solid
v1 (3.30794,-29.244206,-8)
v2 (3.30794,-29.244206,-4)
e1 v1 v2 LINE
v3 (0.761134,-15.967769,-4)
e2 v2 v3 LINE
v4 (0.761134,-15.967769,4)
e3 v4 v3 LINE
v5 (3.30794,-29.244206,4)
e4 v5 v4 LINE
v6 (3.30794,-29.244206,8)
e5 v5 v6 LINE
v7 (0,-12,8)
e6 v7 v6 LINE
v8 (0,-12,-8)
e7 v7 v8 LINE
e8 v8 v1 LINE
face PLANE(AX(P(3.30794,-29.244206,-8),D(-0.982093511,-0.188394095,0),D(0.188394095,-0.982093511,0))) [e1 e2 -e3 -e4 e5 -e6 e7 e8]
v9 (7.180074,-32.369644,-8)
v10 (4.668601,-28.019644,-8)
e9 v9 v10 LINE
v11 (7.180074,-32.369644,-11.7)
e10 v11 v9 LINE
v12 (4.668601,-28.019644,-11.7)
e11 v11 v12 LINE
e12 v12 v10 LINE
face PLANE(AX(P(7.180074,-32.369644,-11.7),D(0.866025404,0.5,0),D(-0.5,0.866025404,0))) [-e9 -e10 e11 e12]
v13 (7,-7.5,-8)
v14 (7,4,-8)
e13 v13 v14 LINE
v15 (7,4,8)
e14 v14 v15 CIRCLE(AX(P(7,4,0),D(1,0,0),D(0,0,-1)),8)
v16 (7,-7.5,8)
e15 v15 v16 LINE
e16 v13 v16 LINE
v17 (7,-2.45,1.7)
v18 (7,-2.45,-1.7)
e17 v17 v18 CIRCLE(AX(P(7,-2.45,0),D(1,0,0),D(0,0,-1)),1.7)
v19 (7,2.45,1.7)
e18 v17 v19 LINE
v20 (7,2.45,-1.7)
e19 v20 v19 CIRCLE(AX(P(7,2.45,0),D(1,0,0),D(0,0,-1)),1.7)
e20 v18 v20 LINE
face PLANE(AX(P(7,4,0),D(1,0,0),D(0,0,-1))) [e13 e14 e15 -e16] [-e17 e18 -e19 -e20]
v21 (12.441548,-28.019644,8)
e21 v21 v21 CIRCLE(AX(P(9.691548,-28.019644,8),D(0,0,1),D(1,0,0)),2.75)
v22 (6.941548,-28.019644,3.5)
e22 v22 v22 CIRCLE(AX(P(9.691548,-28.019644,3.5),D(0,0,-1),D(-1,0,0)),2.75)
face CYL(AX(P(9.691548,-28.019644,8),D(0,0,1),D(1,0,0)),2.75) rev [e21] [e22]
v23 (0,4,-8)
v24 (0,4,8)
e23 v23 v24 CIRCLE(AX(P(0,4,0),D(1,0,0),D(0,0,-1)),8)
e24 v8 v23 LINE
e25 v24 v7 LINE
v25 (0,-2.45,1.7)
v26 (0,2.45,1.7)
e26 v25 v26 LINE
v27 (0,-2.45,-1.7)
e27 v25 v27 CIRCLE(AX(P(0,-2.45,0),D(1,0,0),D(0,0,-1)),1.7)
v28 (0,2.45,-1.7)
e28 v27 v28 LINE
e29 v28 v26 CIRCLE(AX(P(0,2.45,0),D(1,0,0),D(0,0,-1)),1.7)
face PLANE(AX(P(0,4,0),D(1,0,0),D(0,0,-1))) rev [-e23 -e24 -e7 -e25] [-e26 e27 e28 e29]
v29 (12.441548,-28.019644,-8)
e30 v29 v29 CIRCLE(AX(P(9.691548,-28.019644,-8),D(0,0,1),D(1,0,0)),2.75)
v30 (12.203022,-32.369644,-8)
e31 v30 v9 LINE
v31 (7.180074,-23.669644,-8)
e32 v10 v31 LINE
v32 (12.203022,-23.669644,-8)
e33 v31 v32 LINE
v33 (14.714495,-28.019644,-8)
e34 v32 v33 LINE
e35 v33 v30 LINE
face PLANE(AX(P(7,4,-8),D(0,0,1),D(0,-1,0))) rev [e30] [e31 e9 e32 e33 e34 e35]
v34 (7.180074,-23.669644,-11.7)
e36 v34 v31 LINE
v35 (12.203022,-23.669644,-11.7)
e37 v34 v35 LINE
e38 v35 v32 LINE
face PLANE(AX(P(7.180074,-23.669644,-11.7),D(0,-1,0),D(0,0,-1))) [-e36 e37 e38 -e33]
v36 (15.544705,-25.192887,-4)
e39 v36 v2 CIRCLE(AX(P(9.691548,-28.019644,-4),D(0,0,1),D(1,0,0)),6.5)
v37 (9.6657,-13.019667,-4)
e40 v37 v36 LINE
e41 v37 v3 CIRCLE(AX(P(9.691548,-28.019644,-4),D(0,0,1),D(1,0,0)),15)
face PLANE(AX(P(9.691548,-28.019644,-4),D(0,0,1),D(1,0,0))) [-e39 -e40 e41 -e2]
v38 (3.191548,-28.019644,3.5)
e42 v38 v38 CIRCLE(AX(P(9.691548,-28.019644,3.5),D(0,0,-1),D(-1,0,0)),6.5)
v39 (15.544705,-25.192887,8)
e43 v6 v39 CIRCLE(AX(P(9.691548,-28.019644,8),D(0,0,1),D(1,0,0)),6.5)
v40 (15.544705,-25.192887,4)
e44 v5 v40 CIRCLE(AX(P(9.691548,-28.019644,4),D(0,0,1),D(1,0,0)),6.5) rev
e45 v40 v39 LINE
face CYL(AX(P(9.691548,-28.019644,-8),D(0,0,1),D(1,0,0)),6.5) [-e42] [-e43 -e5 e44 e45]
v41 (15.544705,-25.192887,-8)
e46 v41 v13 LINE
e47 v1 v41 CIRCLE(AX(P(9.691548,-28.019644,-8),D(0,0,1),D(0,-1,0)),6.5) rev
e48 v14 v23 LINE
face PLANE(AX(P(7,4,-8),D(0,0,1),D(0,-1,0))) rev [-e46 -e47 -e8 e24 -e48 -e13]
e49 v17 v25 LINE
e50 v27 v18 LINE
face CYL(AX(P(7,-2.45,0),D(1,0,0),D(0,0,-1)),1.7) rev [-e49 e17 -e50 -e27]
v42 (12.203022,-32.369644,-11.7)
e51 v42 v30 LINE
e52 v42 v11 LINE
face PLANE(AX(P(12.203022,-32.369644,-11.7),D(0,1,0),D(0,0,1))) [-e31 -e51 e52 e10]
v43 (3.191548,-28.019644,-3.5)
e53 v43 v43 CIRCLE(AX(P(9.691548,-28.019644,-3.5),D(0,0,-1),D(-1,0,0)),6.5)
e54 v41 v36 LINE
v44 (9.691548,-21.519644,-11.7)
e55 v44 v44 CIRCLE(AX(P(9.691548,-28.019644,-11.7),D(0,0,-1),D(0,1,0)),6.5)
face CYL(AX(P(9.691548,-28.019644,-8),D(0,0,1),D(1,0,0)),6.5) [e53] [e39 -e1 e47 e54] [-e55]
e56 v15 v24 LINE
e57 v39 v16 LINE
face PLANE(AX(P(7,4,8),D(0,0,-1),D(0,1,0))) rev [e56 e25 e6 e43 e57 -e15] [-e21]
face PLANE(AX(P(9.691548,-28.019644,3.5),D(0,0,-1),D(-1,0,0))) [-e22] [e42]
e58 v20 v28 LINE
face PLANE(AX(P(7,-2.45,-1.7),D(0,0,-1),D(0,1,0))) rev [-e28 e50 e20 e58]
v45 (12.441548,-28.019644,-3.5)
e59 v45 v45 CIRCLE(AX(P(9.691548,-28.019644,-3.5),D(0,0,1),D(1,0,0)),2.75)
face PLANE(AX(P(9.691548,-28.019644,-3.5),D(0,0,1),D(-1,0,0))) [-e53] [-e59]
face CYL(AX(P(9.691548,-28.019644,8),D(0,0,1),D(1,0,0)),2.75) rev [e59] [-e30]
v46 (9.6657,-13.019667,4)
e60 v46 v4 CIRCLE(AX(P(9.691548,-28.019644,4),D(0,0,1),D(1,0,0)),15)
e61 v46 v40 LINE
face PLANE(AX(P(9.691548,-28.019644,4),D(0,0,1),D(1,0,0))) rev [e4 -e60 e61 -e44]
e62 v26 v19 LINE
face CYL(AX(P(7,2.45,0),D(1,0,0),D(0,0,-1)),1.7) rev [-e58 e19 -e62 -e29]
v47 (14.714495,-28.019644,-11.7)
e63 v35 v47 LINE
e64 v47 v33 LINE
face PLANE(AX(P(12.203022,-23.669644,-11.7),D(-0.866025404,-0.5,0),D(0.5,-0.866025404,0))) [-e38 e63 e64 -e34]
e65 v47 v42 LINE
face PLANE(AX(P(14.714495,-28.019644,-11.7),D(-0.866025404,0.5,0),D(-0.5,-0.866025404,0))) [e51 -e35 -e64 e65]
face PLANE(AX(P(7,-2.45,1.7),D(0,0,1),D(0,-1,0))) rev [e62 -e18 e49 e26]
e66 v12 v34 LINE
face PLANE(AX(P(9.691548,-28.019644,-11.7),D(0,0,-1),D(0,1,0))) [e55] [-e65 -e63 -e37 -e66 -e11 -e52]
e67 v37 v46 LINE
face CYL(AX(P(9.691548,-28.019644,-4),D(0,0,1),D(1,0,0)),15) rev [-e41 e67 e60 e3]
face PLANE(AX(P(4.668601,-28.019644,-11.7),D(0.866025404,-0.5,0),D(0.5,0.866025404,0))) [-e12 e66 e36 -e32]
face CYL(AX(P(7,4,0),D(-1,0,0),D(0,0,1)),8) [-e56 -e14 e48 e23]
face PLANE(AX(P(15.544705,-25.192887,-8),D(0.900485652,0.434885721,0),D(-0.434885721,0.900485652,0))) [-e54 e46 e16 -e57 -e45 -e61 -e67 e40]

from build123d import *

# Parameters (mm, degrees)
BOSS_EXTRU_1_DEPTH      = 7
D_GAGEMENT_M31_DEPTH    = 7
BOSS_EXTRU_3_DEPTH      = 7
BOSS_EXTRU_4_DEPTH      = 16
ESQUISSE8_R             = 15
ENL_V_MAT_EXTRU_1_DEPTH = 4
ESQUISSE9_R             = 6.5
BOSS_EXTRU_5_DEPTH      = 0.5
D_GAGEMENT_M51_D        = 5.5
ESQUISSE12_R            = 6.5
BOSS_EXTRU_6_DEPTH      = 3.7


# Read off the part's stored shape, not the designer's step: Dégagement M31
with BuildPart() as part:
    # Esquisse1 → Boss.-Extru.1 (new body)
    with BuildSketch(Plane(origin=(0, 0, 0), x_dir=(0, 0, -1), z_dir=(1, 0, 0))):
        with BuildLine():
            Line((8, 4), (8, -4))
            ThreePointArc((8, -4), (0, -12), (-8, -4))
            Line((-8, -4), (-8, 4))
            ThreePointArc((-8, 4), (0, 12), (8, 4))
        make_face()
    extrude(amount=BOSS_EXTRU_1_DEPTH)

    # Dégagement M31 outline → Dégagement M31 (cut)
    with BuildSketch(Plane.YZ):
        with BuildLine():
            Line((-2.45, -1.7), (2.45, -1.7))
            ThreePointArc((2.45, -1.7), (4.15, 0), (2.45, 1.7))
            Line((2.45, 1.7), (-2.45, 1.7))
            ThreePointArc((-2.45, 1.7), (-4.15, 0), (-2.45, -1.7))
        make_face()
    extrude(amount=D_GAGEMENT_M31_DEPTH, mode=Mode.SUBTRACT)

    # Esquisse6 → Boss.-Extru.3 (add, through all)
    with BuildSketch(Plane(origin=(7, 0, 0), x_dir=(0, 0, -1), z_dir=(1, 0, 0))):
        with BuildLine():
            ThreePointArc((-5e-09, -12), (-5.656854251, -9.656854248), (-8, -4))
            Line((-8, -4), (-8, -12))
            Line((-8, -12), (-5e-09, -12))
        make_face()
        with BuildLine():
            ThreePointArc((8, -4), (5.656854248, -9.656854251), (-5e-09, -12))
            Line((-5e-09, -12), (8, -12))
            Line((8, -12), (8, -4))
        make_face()
    extrude(amount=-BOSS_EXTRU_3_DEPTH)

    # Esquisse7 → Boss.-Extru.4 (add, through all)
    with BuildSketch(Plane.XY.offset(8)):
        with BuildLine():
            Line((3.307940197, -29.244206061), (0, -12))
            Line((0, -12), (7, -12))
            Line((7, -12), (7, -7.5))
            Line((7, -7.5), (15.544704758, -25.192887251))
            ThreePointArc((15.544704758, -25.192887251), (11.734497019, -34.190248899), (3.307940197, -29.244206061))
        make_face()
    extrude(amount=-BOSS_EXTRU_4_DEPTH)

    # Esquisse8 → Enlèv. mat.-Extru.1 (cut, symmetric)
    with BuildSketch(Plane.XY):
        with Locations((9.69154802, -28.01964444)):
            Circle(ESQUISSE8_R)
    extrude(amount=ENL_V_MAT_EXTRU_1_DEPTH, both=True, mode=Mode.SUBTRACT)

    # Esquisse9 → Boss.-Extru.5 (add)
    with BuildSketch(Plane(origin=(0, 0, 4), x_dir=(-1, 0, 0), z_dir=(0, 0, -1))):
        with Locations(Location((-9.69154802, -28.01964444, 0), (0, 0, 154.221977628))):
            Circle(ESQUISSE9_R)
    boss_extru_5 = extrude(amount=BOSS_EXTRU_5_DEPTH)

    # Symétrie1: Boss.-Extru.5 across plane
    add(boss_extru_5.mirror(Plane.XY))

    # Dégagement M51 (through all)
    with Locations(Plane.XY.offset(8)):
        with Locations((9.69154802, -28.01964444)):
            Hole(D_GAGEMENT_M51_D / 2)

    # Esquisse12 → Boss.-Extru.6 (add)
    with BuildSketch(Plane(origin=(0, 0, -8), x_dir=(-1, 0, 0), z_dir=(0, 0, -1))):
        with Locations(Location((-9.69154802, -28.01964444, 0), (0, 0, 90))):
            Circle(ESQUISSE12_R)
        Polygon((-4.668600678, -28.01964444), (-7.180074349, -23.66964444), (-12.203021691, -23.66964444), (-14.714495362, -28.01964444), (-12.203021691, -32.36964444), (-7.180074349, -32.36964444), align=None, mode=Mode.SUBTRACT)
    extrude(amount=BOSS_EXTRU_6_DEPTH)


solid = part.part
